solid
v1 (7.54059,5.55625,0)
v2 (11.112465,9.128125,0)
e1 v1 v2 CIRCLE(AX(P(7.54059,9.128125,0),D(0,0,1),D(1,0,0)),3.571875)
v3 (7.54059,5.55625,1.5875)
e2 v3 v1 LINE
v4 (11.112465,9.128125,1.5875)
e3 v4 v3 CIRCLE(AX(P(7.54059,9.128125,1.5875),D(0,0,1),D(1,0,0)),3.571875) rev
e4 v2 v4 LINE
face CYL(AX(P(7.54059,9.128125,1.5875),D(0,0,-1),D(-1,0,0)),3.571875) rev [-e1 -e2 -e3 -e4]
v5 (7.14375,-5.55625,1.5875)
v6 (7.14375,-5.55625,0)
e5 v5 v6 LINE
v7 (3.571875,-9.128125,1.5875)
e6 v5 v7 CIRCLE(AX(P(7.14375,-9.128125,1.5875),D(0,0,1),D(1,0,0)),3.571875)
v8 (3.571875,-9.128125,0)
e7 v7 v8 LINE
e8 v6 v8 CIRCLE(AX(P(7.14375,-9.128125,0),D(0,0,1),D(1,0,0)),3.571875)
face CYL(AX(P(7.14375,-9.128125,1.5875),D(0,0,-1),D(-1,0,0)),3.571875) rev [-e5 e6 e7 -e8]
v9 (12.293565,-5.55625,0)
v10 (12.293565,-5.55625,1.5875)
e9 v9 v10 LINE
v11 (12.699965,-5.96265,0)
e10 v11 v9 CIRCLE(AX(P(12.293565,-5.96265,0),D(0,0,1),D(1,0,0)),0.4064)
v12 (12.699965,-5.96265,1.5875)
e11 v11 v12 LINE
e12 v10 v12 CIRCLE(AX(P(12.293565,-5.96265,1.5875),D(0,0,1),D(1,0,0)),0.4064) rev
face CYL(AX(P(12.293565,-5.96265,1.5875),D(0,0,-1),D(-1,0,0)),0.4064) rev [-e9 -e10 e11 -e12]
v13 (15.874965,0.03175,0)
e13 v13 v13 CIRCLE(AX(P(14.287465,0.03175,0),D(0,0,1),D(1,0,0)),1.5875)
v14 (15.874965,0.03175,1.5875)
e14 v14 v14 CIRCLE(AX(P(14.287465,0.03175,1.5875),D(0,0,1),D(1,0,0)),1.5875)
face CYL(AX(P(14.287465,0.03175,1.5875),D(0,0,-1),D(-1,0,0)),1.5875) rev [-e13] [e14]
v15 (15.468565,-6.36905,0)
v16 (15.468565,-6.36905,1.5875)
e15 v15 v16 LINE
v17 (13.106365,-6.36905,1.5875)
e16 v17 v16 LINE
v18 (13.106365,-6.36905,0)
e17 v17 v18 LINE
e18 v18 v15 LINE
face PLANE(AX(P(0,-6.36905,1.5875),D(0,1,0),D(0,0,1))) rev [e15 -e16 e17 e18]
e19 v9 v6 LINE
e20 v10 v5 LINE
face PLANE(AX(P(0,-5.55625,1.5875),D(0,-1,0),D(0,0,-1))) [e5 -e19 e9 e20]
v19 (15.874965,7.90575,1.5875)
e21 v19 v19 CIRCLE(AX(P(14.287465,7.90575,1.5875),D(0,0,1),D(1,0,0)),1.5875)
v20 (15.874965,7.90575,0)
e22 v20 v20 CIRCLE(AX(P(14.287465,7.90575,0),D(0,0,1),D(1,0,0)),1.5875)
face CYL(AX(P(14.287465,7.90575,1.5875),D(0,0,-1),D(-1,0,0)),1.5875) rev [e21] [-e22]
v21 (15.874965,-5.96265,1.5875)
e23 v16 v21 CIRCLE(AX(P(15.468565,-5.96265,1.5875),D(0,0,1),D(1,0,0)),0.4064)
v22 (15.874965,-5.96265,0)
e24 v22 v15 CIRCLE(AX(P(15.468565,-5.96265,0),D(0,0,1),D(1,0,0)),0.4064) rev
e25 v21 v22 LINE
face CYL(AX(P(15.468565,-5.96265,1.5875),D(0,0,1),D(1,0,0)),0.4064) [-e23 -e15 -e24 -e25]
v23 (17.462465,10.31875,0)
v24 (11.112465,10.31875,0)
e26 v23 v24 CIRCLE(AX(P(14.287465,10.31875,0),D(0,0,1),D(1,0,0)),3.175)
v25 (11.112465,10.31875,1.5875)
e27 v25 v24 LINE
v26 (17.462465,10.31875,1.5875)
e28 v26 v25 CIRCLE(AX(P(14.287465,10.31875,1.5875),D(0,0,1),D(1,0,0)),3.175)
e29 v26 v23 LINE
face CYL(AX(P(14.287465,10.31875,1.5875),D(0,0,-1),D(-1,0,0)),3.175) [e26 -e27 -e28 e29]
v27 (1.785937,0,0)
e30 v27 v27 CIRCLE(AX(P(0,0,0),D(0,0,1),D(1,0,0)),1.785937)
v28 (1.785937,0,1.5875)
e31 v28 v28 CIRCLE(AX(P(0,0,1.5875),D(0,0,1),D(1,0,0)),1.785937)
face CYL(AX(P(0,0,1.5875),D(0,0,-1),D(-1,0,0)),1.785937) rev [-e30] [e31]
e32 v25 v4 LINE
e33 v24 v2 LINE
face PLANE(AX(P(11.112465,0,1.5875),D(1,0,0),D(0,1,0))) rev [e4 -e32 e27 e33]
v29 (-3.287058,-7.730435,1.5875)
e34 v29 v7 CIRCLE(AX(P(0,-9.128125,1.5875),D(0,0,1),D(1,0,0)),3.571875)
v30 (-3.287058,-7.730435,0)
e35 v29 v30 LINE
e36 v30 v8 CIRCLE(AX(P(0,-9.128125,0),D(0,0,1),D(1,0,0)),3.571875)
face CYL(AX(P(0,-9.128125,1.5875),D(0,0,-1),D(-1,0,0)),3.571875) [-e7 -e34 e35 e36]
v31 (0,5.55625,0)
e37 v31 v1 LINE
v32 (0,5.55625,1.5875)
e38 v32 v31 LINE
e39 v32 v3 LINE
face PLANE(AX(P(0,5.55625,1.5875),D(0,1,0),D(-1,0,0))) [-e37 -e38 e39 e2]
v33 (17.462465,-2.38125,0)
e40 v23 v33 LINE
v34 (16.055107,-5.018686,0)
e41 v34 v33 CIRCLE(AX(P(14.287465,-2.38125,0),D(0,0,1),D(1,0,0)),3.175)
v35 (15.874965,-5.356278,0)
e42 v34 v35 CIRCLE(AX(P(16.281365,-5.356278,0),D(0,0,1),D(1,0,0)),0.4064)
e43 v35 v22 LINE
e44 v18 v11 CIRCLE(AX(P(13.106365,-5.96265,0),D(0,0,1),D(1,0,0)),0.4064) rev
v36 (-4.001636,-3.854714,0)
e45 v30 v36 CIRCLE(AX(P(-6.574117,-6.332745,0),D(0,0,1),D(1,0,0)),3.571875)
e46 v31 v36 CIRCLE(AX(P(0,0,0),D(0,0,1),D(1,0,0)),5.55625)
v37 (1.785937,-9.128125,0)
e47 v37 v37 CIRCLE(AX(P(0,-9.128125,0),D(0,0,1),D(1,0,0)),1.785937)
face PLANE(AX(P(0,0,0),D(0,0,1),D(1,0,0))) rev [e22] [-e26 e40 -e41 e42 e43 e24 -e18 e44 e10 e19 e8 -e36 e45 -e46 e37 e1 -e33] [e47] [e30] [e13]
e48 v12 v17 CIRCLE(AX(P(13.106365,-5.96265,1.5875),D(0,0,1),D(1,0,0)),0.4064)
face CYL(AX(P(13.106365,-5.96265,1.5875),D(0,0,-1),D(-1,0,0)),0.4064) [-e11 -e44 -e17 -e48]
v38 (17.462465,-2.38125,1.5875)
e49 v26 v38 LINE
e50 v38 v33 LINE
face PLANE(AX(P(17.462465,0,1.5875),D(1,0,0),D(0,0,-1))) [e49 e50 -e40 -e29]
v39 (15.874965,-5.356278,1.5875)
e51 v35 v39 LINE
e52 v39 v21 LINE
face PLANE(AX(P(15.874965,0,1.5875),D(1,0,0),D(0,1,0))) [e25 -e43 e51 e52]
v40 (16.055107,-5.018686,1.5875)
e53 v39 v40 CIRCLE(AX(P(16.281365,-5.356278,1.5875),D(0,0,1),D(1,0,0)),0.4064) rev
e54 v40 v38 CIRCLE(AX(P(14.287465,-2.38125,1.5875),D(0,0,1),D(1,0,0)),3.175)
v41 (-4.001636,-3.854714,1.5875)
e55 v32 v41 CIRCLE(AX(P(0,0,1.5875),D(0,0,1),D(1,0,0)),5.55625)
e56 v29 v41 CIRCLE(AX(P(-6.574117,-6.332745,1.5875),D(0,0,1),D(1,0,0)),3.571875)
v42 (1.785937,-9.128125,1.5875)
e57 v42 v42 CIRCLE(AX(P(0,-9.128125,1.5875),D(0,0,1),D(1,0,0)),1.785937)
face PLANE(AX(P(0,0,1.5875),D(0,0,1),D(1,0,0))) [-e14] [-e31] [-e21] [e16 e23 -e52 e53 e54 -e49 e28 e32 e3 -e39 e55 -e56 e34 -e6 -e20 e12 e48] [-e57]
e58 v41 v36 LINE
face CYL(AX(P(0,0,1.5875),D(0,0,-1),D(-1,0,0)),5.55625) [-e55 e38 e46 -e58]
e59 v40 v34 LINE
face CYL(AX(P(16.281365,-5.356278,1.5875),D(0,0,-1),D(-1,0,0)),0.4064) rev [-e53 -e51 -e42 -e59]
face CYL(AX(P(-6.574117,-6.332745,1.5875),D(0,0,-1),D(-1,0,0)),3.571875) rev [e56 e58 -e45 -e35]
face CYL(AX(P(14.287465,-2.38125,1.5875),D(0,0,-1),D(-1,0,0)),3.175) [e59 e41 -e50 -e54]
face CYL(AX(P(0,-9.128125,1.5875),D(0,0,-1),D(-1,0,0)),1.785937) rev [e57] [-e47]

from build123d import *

# Parameters (mm, degrees)
SKETCH1_R           = 1.5875
SKETCH1_R_2         = 1.7859375
BOSS_EXTRUDE1_DEPTH = 1.5875
FILLET1_R           = 0.4064
FILLET2_R           = 3.571875


with BuildPart() as part:
    # Sketch1 → Boss-Extrude1 (new body)
    with BuildSketch(Plane.XY):
        with BuildLine():
            ThreePointArc((17.462464722, 10.31875), (14.287464722, 13.49375), (11.112464722, 10.31875))
            Line((11.112464722, 10.31875), (11.112464722, 5.55625))
            Line((11.112464722, 5.55625), (0, 5.55625))
            ThreePointArc((0, 5.55625), (-5.113201992, 2.17418478), (-4.001636336, -3.854714088))
            ThreePointArc((-4.001636336, -3.854714088), (-3.061446663, -5.6851033), (-3.287058398, -7.730434724))
            ThreePointArc((-3.287058398, -7.730434724), (-0.713207299, -12.628071623), (3.571875, -9.128125))
            ThreePointArc((3.571875, -9.128125), (4.61805296, -6.602427972), (7.143749984, -5.55625))
            Line((7.143749984, -5.55625), (12.699964722, -5.55625))
            Line((12.699964722, -5.55625), (12.699964722, -6.36905))
            Line((12.699964722, -6.36905), (15.874964722, -6.36905))
            Line((15.874964722, -6.36905), (15.874964722, -5.130880657))
            ThreePointArc((15.874964722, -5.130880657), (17.037095379, -3.96875), (17.462464722, -2.38125))
            Line((17.462464722, -2.38125), (17.462464722, 10.31875))
        make_face()
        with Locations((14.287464722, 0.03175)):
            Circle(SKETCH1_R, mode=Mode.SUBTRACT)
        with Locations((14.287464722, 7.90575)):
            Circle(SKETCH1_R, mode=Mode.SUBTRACT)
        Circle(SKETCH1_R_2, mode=Mode.SUBTRACT)
        with Locations((0, -9.128125)):
            Circle(SKETCH1_R_2, mode=Mode.SUBTRACT)
    extrude(amount=BOSS_EXTRUDE1_DEPTH)

    # Fillet1
    fillet1_edges = [part.edges().sort_by_distance(p)[0] for p in [
        (15.874964722, -5.130880657, 0.79375),
        (15.874964722, -6.36905, 0.79375),
        (12.699964722, -5.55625, 0.79375),
        (12.699964722, -6.36905, 0.79375),
    ]]
    fillet(fillet1_edges, radius=FILLET1_R - 0.0001)  # a hair under: the kernel refuses the full size

    # Fillet2
    fillet2_edges = [part.edges().sort_by_distance(p)[0] for p in [
        (11.112464722, 5.55625, 0.79375),
    ]]
    fillet(fillet2_edges, radius=FILLET2_R)


solid = part.part
